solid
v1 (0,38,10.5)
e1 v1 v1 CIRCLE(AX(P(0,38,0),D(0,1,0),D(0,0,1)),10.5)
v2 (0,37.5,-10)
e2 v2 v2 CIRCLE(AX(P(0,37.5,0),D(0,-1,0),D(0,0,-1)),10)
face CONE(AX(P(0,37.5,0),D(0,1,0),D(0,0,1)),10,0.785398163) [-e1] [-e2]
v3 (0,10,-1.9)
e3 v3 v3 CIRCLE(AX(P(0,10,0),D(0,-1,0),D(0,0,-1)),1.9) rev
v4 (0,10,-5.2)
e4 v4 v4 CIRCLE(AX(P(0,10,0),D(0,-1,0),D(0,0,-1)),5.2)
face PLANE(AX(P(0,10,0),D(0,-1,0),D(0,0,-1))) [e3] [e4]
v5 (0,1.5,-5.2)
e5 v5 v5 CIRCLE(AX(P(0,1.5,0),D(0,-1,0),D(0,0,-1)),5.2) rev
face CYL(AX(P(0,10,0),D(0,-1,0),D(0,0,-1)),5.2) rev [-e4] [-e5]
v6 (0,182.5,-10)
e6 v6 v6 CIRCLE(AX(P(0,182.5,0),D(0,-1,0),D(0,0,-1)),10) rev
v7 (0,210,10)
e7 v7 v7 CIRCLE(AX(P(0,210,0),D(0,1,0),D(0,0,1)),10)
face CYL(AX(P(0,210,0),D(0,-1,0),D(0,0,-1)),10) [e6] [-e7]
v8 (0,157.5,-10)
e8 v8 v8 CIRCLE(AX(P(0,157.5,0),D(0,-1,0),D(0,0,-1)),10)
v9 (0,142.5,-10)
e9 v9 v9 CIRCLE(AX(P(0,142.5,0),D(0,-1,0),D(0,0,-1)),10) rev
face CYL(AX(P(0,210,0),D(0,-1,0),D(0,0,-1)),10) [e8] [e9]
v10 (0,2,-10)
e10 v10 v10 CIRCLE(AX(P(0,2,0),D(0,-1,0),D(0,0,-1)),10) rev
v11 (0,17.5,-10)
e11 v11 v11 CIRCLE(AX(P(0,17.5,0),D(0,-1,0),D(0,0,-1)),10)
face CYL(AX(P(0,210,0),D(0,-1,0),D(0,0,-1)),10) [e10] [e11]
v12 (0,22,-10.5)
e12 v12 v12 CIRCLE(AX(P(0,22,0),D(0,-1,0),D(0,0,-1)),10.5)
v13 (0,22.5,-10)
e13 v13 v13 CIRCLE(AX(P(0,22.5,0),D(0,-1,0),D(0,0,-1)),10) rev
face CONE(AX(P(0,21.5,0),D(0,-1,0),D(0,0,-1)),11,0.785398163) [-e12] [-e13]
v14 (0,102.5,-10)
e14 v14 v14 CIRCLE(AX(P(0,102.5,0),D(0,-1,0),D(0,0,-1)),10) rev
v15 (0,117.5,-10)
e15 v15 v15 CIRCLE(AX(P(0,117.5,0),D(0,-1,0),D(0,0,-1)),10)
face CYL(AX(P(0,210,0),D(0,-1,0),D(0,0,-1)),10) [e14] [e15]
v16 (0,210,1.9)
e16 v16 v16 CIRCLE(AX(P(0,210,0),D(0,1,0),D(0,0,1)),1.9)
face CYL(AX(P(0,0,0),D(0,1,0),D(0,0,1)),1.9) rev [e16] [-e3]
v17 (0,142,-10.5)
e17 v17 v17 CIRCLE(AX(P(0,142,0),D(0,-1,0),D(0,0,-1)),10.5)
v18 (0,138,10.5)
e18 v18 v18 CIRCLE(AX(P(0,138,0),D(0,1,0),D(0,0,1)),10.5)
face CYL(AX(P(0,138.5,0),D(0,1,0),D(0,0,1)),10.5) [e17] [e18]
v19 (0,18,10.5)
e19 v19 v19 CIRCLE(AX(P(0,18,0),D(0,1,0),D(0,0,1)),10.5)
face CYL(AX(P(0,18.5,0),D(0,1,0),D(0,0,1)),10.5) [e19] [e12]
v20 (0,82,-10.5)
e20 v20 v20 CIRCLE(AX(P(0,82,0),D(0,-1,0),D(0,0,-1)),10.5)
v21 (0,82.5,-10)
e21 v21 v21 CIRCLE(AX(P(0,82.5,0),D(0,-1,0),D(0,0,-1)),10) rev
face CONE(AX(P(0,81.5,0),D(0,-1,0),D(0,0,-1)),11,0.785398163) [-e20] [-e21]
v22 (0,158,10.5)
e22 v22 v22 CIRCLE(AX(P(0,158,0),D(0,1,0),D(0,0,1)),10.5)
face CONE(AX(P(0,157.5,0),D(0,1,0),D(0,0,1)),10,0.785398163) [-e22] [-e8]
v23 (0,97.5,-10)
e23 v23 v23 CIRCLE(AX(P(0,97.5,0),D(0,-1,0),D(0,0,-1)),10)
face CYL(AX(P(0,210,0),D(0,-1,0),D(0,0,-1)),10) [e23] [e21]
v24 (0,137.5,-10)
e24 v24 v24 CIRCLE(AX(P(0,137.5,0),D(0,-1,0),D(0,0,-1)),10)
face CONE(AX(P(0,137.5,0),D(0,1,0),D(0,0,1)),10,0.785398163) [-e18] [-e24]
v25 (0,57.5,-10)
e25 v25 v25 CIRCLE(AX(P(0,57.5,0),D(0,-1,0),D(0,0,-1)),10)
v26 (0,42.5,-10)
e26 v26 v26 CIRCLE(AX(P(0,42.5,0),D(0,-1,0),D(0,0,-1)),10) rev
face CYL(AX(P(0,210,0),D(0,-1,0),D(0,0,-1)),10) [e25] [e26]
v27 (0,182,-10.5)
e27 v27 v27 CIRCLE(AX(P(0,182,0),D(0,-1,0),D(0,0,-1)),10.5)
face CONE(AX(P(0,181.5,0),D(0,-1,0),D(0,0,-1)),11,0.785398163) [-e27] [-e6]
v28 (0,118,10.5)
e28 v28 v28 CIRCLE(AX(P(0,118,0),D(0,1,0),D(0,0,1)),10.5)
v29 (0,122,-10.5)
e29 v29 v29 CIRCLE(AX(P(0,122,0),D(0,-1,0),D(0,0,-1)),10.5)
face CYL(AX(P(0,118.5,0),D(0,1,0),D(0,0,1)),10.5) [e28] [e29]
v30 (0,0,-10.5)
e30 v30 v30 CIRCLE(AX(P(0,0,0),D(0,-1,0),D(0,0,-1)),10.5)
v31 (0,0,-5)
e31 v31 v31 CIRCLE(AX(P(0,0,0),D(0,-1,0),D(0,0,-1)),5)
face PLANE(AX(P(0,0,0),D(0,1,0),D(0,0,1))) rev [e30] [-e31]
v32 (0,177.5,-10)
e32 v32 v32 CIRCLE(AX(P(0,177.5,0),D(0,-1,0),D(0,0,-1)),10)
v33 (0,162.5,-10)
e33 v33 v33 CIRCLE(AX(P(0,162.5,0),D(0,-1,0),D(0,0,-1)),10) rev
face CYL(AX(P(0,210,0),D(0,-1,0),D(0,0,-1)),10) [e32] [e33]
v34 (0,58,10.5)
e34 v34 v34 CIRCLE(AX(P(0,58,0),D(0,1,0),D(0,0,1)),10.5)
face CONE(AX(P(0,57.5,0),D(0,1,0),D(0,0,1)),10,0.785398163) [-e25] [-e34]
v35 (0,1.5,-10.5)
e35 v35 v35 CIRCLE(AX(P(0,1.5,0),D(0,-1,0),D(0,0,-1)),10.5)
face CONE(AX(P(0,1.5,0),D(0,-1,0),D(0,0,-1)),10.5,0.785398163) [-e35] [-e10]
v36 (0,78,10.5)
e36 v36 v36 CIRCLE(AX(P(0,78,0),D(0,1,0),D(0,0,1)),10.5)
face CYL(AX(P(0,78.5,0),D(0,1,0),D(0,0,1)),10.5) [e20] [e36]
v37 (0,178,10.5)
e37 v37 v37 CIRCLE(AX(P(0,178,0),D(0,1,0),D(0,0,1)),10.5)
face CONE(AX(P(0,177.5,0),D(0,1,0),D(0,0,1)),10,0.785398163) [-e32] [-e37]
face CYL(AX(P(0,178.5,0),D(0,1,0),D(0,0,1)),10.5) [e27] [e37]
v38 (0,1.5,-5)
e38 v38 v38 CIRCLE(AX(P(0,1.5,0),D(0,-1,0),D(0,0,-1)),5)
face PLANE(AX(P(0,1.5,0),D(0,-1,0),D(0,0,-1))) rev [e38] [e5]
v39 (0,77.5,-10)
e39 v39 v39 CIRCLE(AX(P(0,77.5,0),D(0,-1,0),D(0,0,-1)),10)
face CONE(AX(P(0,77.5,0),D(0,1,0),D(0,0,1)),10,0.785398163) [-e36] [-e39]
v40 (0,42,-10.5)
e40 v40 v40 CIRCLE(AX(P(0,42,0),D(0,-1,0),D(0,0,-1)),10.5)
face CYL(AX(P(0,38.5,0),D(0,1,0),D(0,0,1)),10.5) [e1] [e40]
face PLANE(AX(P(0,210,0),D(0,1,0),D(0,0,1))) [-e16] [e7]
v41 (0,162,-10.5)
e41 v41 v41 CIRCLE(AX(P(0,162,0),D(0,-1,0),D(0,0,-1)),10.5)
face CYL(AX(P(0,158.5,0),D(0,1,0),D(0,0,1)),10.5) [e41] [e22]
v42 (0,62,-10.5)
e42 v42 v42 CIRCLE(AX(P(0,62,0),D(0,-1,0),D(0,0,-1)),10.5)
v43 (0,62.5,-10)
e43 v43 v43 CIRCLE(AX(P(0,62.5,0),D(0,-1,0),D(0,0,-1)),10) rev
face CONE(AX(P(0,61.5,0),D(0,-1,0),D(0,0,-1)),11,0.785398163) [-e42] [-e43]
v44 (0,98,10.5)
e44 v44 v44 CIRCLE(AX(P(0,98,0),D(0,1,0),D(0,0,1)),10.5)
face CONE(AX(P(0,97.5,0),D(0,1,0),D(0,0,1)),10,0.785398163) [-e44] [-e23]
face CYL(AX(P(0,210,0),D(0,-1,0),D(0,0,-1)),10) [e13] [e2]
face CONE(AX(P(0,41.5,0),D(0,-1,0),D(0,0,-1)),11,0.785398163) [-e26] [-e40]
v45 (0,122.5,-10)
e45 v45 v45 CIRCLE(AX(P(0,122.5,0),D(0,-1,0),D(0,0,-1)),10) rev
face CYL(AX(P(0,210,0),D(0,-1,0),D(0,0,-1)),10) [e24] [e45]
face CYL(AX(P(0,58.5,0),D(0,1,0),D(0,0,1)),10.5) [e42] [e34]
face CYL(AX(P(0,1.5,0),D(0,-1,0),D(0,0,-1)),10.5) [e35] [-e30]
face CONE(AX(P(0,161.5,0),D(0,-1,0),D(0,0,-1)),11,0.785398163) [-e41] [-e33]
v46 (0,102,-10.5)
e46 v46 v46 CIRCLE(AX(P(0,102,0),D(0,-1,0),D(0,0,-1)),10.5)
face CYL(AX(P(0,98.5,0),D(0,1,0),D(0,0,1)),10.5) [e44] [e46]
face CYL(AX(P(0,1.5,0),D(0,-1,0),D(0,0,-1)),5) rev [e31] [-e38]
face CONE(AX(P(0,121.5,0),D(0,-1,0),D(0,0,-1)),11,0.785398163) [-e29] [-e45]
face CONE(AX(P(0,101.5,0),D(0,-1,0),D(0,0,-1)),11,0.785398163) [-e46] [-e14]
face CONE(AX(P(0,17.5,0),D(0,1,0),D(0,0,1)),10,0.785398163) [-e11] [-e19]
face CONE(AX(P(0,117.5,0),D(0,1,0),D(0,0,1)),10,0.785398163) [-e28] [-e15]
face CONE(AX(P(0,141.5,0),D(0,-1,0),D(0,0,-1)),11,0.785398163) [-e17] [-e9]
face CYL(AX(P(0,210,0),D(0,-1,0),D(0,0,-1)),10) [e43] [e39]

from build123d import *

# Parameters (mm, degrees)
SKETCH_1_R                             = 10
EXTRUDE_1_DEPTH                        = 210
SKETCH_2_R                             = 10.5
EXTRUDE_2_DEPTH                        = 1.5
CHAMFER_1_SIZE                         = 1
PATTERN_LINEAR_1_COUNT                 = 5
PATTERN_LINEAR_1_PITCH                 = 20
CHAMFER_1_OF_PATTERN_LINEAR_1_SIZE     = 1
PATTERN_LINEAR_1_COL_COUNT             = 5
PATTERN_LINEAR_1_COL_PITCH             = 20
CHAMFER_1_OF_PATTERN_LINEAR_1_COL_SIZE = 1
CUT_EXTRUDE_1_DEPTH                    = 211.524345386
CUT_EXTRUDE_1_DEPTH_BACK               = 211.524345386
SKETCH_3_R                             = 1.9
SKETCH_11_R                            = 5.2
CUT_EXTRUDE_2_DEPTH                    = 10
SKETCH_12_R                            = 10.5
SKETCH_12_R_2                          = 5
EXTRUDE_3_DEPTH                        = 1.5
CHAMFER_2_SIZE                         = 0.5


# Some blends are built 0.0001 mm under size
with BuildPart() as part:
    # 草图1 → 凸台-拉伸1 (new body)
    with BuildSketch(Plane(origin=(0, 0, 0), x_dir=(1, 0, 0), z_dir=(0, 1, 0))):
        with Locations(Location((0, 0, 0), (0, 0, 270))):
            Circle(SKETCH_1_R)
    extrude(amount=EXTRUDE_1_DEPTH)

    # 草图2 → 凸台-拉伸2 (add, symmetric)
    with BuildSketch(Plane(origin=(0, 100, 0), x_dir=(-1, 0, 0), z_dir=(0, -1, 0))):
        with Locations(Location((0, 0, 0), (0, 0, 90))):
            Circle(SKETCH_2_R)
    extrude_2 = extrude(amount=EXTRUDE_2_DEPTH, both=True)

    # 倒角1
    # the kernel refuses this chamfer: 1 mm, written as the material it adds along each edge
    with BuildSketch(Plane(origin=(0, 101.5, 0), x_dir=(0, 0, 1), z_dir=(1, 0, 0))) as chamfer_1_piece_1_section:
        Polygon((10 + CHAMFER_1_SIZE, 0), (10, -CHAMFER_1_SIZE), (10, 0), align=None)
    chamfer_1_piece_1 = revolve(axis=Axis((0, 101.5, 0), (0, -1, 0)), mode=Mode.PRIVATE)
    chamfer_1_piece_1 = chamfer_1_piece_1 & Plane(origin=(0, 102.243131565, 0), x_dir=(0, 0, -1), z_dir=(0, -1, 0)) * Cylinder(10.5, 44, mode=Mode.PRIVATE)
    add(chamfer_1_piece_1)
    with BuildSketch(Plane(origin=(0, 98.5, 0), x_dir=(0, 0, 1), z_dir=(1, 0, 0))) as chamfer_1_piece_2_section:
        Polygon((10, CHAMFER_1_SIZE), (10 + CHAMFER_1_SIZE, 0), (10, 0), align=None)
    chamfer_1_piece_2 = revolve(axis=Axis((0, 98.5, 0), (0, -1, 0)), mode=Mode.PRIVATE)
    chamfer_1_piece_2 = chamfer_1_piece_2 & Plane(origin=(0, 97.756868435, 0), x_dir=(0, 0, -1), z_dir=(0, -1, 0)) * Cylinder(10.5, 44, mode=Mode.PRIVATE)
    add(chamfer_1_piece_2)

    # 阵列(线性)1: 凸台-拉伸2 ×5
    with Locations(*[(0, i * PATTERN_LINEAR_1_PITCH, 0) for i in range(1, PATTERN_LINEAR_1_COUNT)]):
        add(extrude_2)

    # 倒角1 of 阵列(线性)1
    # the kernel refuses this chamfer: 1 mm, written as the material it adds along each edge
    with BuildSketch(Plane(origin=(0, 121.5, 0), x_dir=(0, 0, 1), z_dir=(1, 0, 0))) as chamfer_1_of_pattern_linear_1_piece_1_section:
        Polygon((10 + CHAMFER_1_OF_PATTERN_LINEAR_1_SIZE, 0), (10, -CHAMFER_1_OF_PATTERN_LINEAR_1_SIZE), (10, 0), align=None)
    chamfer_1_of_pattern_linear_1_piece_1 = revolve(axis=Axis((0, 121.5, 0), (0, -1, 0)), mode=Mode.PRIVATE)
    chamfer_1_of_pattern_linear_1_piece_1 = chamfer_1_of_pattern_linear_1_piece_1 & Plane(origin=(0, 122.243131565, 0), x_dir=(0, 0, -1), z_dir=(0, -1, 0)) * Cylinder(10.5, 44, mode=Mode.PRIVATE)
    add(chamfer_1_of_pattern_linear_1_piece_1)
    with BuildSketch(Plane(origin=(0, 118.5, 0), x_dir=(0, 0, 1), z_dir=(1, 0, 0))) as chamfer_1_of_pattern_linear_1_piece_2_section:
        Polygon((10, CHAMFER_1_OF_PATTERN_LINEAR_1_SIZE), (10 + CHAMFER_1_OF_PATTERN_LINEAR_1_SIZE, 0), (10, 0), align=None)
    chamfer_1_of_pattern_linear_1_piece_2 = revolve(axis=Axis((0, 118.5, 0), (0, -1, 0)), mode=Mode.PRIVATE)
    chamfer_1_of_pattern_linear_1_piece_2 = chamfer_1_of_pattern_linear_1_piece_2 & Plane(origin=(0, 117.756868435, 0), x_dir=(0, 0, -1), z_dir=(0, -1, 0)) * Cylinder(10.5, 44, mode=Mode.PRIVATE)
    add(chamfer_1_of_pattern_linear_1_piece_2)
    with BuildSketch(Plane(origin=(0, 141.5, 0), x_dir=(0, 0, 1), z_dir=(1, 0, 0))) as chamfer_1_of_pattern_linear_1_piece_3_section:
        Polygon((10 + CHAMFER_1_OF_PATTERN_LINEAR_1_SIZE, 0), (10, -CHAMFER_1_OF_PATTERN_LINEAR_1_SIZE), (10, 0), align=None)
    chamfer_1_of_pattern_linear_1_piece_3 = revolve(axis=Axis((0, 141.5, 0), (0, -1, 0)), mode=Mode.PRIVATE)
    chamfer_1_of_pattern_linear_1_piece_3 = chamfer_1_of_pattern_linear_1_piece_3 & Plane(origin=(0, 142.243131565, 0), x_dir=(0, 0, -1), z_dir=(0, -1, 0)) * Cylinder(10.5, 44, mode=Mode.PRIVATE)
    add(chamfer_1_of_pattern_linear_1_piece_3)
    with BuildSketch(Plane(origin=(0, 138.5, 0), x_dir=(0, 0, 1), z_dir=(1, 0, 0))) as chamfer_1_of_pattern_linear_1_piece_4_section:
        Polygon((10, CHAMFER_1_OF_PATTERN_LINEAR_1_SIZE), (10 + CHAMFER_1_OF_PATTERN_LINEAR_1_SIZE, 0), (10, 0), align=None)
    chamfer_1_of_pattern_linear_1_piece_4 = revolve(axis=Axis((0, 138.5, 0), (0, -1, 0)), mode=Mode.PRIVATE)
    chamfer_1_of_pattern_linear_1_piece_4 = chamfer_1_of_pattern_linear_1_piece_4 & Plane(origin=(0, 137.756868435, 0), x_dir=(0, 0, -1), z_dir=(0, -1, 0)) * Cylinder(10.5, 44, mode=Mode.PRIVATE)
    add(chamfer_1_of_pattern_linear_1_piece_4)
    with BuildSketch(Plane(origin=(0, 161.5, 0), x_dir=(0, 0, 1), z_dir=(1, 0, 0))) as chamfer_1_of_pattern_linear_1_piece_5_section:
        Polygon((10 + CHAMFER_1_OF_PATTERN_LINEAR_1_SIZE, 0), (10, -CHAMFER_1_OF_PATTERN_LINEAR_1_SIZE), (10, 0), align=None)
    chamfer_1_of_pattern_linear_1_piece_5 = revolve(axis=Axis((0, 161.5, 0), (0, -1, 0)), mode=Mode.PRIVATE)
    chamfer_1_of_pattern_linear_1_piece_5 = chamfer_1_of_pattern_linear_1_piece_5 & Plane(origin=(0, 162.243131565, 0), x_dir=(0, 0, -1), z_dir=(0, -1, 0)) * Cylinder(10.5, 44, mode=Mode.PRIVATE)
    add(chamfer_1_of_pattern_linear_1_piece_5)
    with BuildSketch(Plane(origin=(0, 158.5, 0), x_dir=(0, 0, 1), z_dir=(1, 0, 0))) as chamfer_1_of_pattern_linear_1_piece_6_section:
        Polygon((10, CHAMFER_1_OF_PATTERN_LINEAR_1_SIZE), (10 + CHAMFER_1_OF_PATTERN_LINEAR_1_SIZE, 0), (10, 0), align=None)
    chamfer_1_of_pattern_linear_1_piece_6 = revolve(axis=Axis((0, 158.5, 0), (0, -1, 0)), mode=Mode.PRIVATE)
    chamfer_1_of_pattern_linear_1_piece_6 = chamfer_1_of_pattern_linear_1_piece_6 & Plane(origin=(0, 157.756868435, 0), x_dir=(0, 0, -1), z_dir=(0, -1, 0)) * Cylinder(10.5, 44, mode=Mode.PRIVATE)
    add(chamfer_1_of_pattern_linear_1_piece_6)
    with BuildSketch(Plane(origin=(0, 181.5, 0), x_dir=(0, 0, 1), z_dir=(1, 0, 0))) as chamfer_1_of_pattern_linear_1_piece_7_section:
        Polygon((10 + CHAMFER_1_OF_PATTERN_LINEAR_1_SIZE, 0), (10, -CHAMFER_1_OF_PATTERN_LINEAR_1_SIZE), (10, 0), align=None)
    chamfer_1_of_pattern_linear_1_piece_7 = revolve(axis=Axis((0, 181.5, 0), (0, -1, 0)), mode=Mode.PRIVATE)
    chamfer_1_of_pattern_linear_1_piece_7 = chamfer_1_of_pattern_linear_1_piece_7 & Plane(origin=(0, 182.243131565, 0), x_dir=(0, 0, -1), z_dir=(0, -1, 0)) * Cylinder(10.5, 44, mode=Mode.PRIVATE)
    add(chamfer_1_of_pattern_linear_1_piece_7)
    with BuildSketch(Plane(origin=(0, 178.5, 0), x_dir=(0, 0, 1), z_dir=(1, 0, 0))) as chamfer_1_of_pattern_linear_1_piece_8_section:
        Polygon((10, CHAMFER_1_OF_PATTERN_LINEAR_1_SIZE), (10 + CHAMFER_1_OF_PATTERN_LINEAR_1_SIZE, 0), (10, 0), align=None)
    chamfer_1_of_pattern_linear_1_piece_8 = revolve(axis=Axis((0, 178.5, 0), (0, -1, 0)), mode=Mode.PRIVATE)
    chamfer_1_of_pattern_linear_1_piece_8 = chamfer_1_of_pattern_linear_1_piece_8 & Plane(origin=(0, 177.756868435, 0), x_dir=(0, 0, -1), z_dir=(0, -1, 0)) * Cylinder(10.5, 44, mode=Mode.PRIVATE)
    add(chamfer_1_of_pattern_linear_1_piece_8)

    # 阵列(线性)1 col: 凸台-拉伸2 ×5
    with Locations(*[(0, -i * PATTERN_LINEAR_1_COL_PITCH, 0) for i in range(1, PATTERN_LINEAR_1_COL_COUNT)]):
        add(extrude_2)

    # 倒角1 of 阵列(线性)1 col
    # the kernel refuses this chamfer: 1 mm, written as the material it adds along each edge
    with BuildSketch(Plane(origin=(0, 81.5, 0), x_dir=(0, 0, 1), z_dir=(1, 0, 0))) as chamfer_1_of_pattern_linear_1_col_piece_1_section:
        Polygon((10, -CHAMFER_1_OF_PATTERN_LINEAR_1_COL_SIZE), (10 + CHAMFER_1_OF_PATTERN_LINEAR_1_COL_SIZE, 0), (10, 0), align=None)
    chamfer_1_of_pattern_linear_1_col_piece_1 = revolve(axis=Axis((0, 81.5, 0), (0, -1, 0)), mode=Mode.PRIVATE)
    chamfer_1_of_pattern_linear_1_col_piece_1 = chamfer_1_of_pattern_linear_1_col_piece_1 & Plane(origin=(0, 82.243131565, 0), x_dir=(0, 0, -1), z_dir=(0, -1, 0)) * Cylinder(10.5, 44, mode=Mode.PRIVATE)
    add(chamfer_1_of_pattern_linear_1_col_piece_1)
    with BuildSketch(Plane(origin=(0, 78.5, 0), x_dir=(0, 0, 1), z_dir=(1, 0, 0))) as chamfer_1_of_pattern_linear_1_col_piece_2_section:
        Polygon((10 + CHAMFER_1_OF_PATTERN_LINEAR_1_COL_SIZE, 0), (10, CHAMFER_1_OF_PATTERN_LINEAR_1_COL_SIZE), (10, 0), align=None)
    chamfer_1_of_pattern_linear_1_col_piece_2 = revolve(axis=Axis((0, 78.5, 0), (0, -1, 0)), mode=Mode.PRIVATE)
    chamfer_1_of_pattern_linear_1_col_piece_2 = chamfer_1_of_pattern_linear_1_col_piece_2 & Plane(origin=(0, 77.756868435, 0), x_dir=(0, 0, -1), z_dir=(0, -1, 0)) * Cylinder(10.5, 44, mode=Mode.PRIVATE)
    add(chamfer_1_of_pattern_linear_1_col_piece_2)
    with BuildSketch(Plane(origin=(0, 61.5, 0), x_dir=(0, 0, 1), z_dir=(1, 0, 0))) as chamfer_1_of_pattern_linear_1_col_piece_3_section:
        Polygon((10, -CHAMFER_1_OF_PATTERN_LINEAR_1_COL_SIZE), (10 + CHAMFER_1_OF_PATTERN_LINEAR_1_COL_SIZE, 0), (10, 0), align=None)
    chamfer_1_of_pattern_linear_1_col_piece_3 = revolve(axis=Axis((0, 61.5, 0), (0, -1, 0)), mode=Mode.PRIVATE)
    chamfer_1_of_pattern_linear_1_col_piece_3 = chamfer_1_of_pattern_linear_1_col_piece_3 & Plane(origin=(0, 62.243131565, 0), x_dir=(0, 0, -1), z_dir=(0, -1, 0)) * Cylinder(10.5, 44, mode=Mode.PRIVATE)
    add(chamfer_1_of_pattern_linear_1_col_piece_3)
    with BuildSketch(Plane(origin=(0, 58.5, 0), x_dir=(0, 0, 1), z_dir=(1, 0, 0))) as chamfer_1_of_pattern_linear_1_col_piece_4_section:
        Polygon((10 + CHAMFER_1_OF_PATTERN_LINEAR_1_COL_SIZE, 0), (10, CHAMFER_1_OF_PATTERN_LINEAR_1_COL_SIZE), (10, 0), align=None)
    chamfer_1_of_pattern_linear_1_col_piece_4 = revolve(axis=Axis((0, 58.5, 0), (0, -1, 0)), mode=Mode.PRIVATE)
    chamfer_1_of_pattern_linear_1_col_piece_4 = chamfer_1_of_pattern_linear_1_col_piece_4 & Plane(origin=(0, 57.756868435, 0), x_dir=(0, 0, -1), z_dir=(0, -1, 0)) * Cylinder(10.5, 44, mode=Mode.PRIVATE)
    add(chamfer_1_of_pattern_linear_1_col_piece_4)
    with BuildSketch(Plane(origin=(0, 41.5, 0), x_dir=(0, 0, 1), z_dir=(1, 0, 0))) as chamfer_1_of_pattern_linear_1_col_piece_5_section:
        Polygon((10, -CHAMFER_1_OF_PATTERN_LINEAR_1_COL_SIZE), (10 + CHAMFER_1_OF_PATTERN_LINEAR_1_COL_SIZE, 0), (10, 0), align=None)
    chamfer_1_of_pattern_linear_1_col_piece_5 = revolve(axis=Axis((0, 41.5, 0), (0, -1, 0)), mode=Mode.PRIVATE)
    chamfer_1_of_pattern_linear_1_col_piece_5 = chamfer_1_of_pattern_linear_1_col_piece_5 & Plane(origin=(0, 42.243131565, 0), x_dir=(0, 0, -1), z_dir=(0, -1, 0)) * Cylinder(10.5, 44, mode=Mode.PRIVATE)
    add(chamfer_1_of_pattern_linear_1_col_piece_5)
    with BuildSketch(Plane(origin=(0, 38.5, 0), x_dir=(0, 0, 1), z_dir=(1, 0, 0))) as chamfer_1_of_pattern_linear_1_col_piece_6_section:
        Polygon((10 + CHAMFER_1_OF_PATTERN_LINEAR_1_COL_SIZE, 0), (10, CHAMFER_1_OF_PATTERN_LINEAR_1_COL_SIZE), (10, 0), align=None)
    chamfer_1_of_pattern_linear_1_col_piece_6 = revolve(axis=Axis((0, 38.5, 0), (0, -1, 0)), mode=Mode.PRIVATE)
    chamfer_1_of_pattern_linear_1_col_piece_6 = chamfer_1_of_pattern_linear_1_col_piece_6 & Plane(origin=(0, 37.756868435, 0), x_dir=(0, 0, -1), z_dir=(0, -1, 0)) * Cylinder(10.5, 44, mode=Mode.PRIVATE)
    add(chamfer_1_of_pattern_linear_1_col_piece_6)
    with BuildSketch(Plane(origin=(0, 21.5, 0), x_dir=(0, 0, 1), z_dir=(1, 0, 0))) as chamfer_1_of_pattern_linear_1_col_piece_7_section:
        Polygon((10, -CHAMFER_1_OF_PATTERN_LINEAR_1_COL_SIZE), (10 + CHAMFER_1_OF_PATTERN_LINEAR_1_COL_SIZE, 0), (10, 0), align=None)
    chamfer_1_of_pattern_linear_1_col_piece_7 = revolve(axis=Axis((0, 21.5, 0), (0, -1, 0)), mode=Mode.PRIVATE)
    chamfer_1_of_pattern_linear_1_col_piece_7 = chamfer_1_of_pattern_linear_1_col_piece_7 & Plane(origin=(0, 22.243131565, 0), x_dir=(0, 0, -1), z_dir=(0, -1, 0)) * Cylinder(10.5, 44, mode=Mode.PRIVATE)
    add(chamfer_1_of_pattern_linear_1_col_piece_7)
    with BuildSketch(Plane(origin=(0, 18.5, 0), x_dir=(0, 0, 1), z_dir=(1, 0, 0))) as chamfer_1_of_pattern_linear_1_col_piece_8_section:
        Polygon((10 + CHAMFER_1_OF_PATTERN_LINEAR_1_COL_SIZE, 0), (10, CHAMFER_1_OF_PATTERN_LINEAR_1_COL_SIZE), (10, 0), align=None)
    chamfer_1_of_pattern_linear_1_col_piece_8 = revolve(axis=Axis((0, 18.5, 0), (0, -1, 0)), mode=Mode.PRIVATE)
    chamfer_1_of_pattern_linear_1_col_piece_8 = chamfer_1_of_pattern_linear_1_col_piece_8 & Plane(origin=(0, 17.756868435, 0), x_dir=(0, 0, -1), z_dir=(0, -1, 0)) * Cylinder(10.5, 44, mode=Mode.PRIVATE)
    add(chamfer_1_of_pattern_linear_1_col_piece_8)

    # 草图3 → 切除-拉伸1 (cut, two sides: drawn at the far end of the back side and taken through both)
    with BuildSketch(Plane(origin=(0, 210, 0), x_dir=(1, 0, 0), z_dir=(0, 1, 0)).offset(-CUT_EXTRUDE_1_DEPTH_BACK)):
        with Locations(Location((0, 0, 0), (0, 0, 270))):
            Circle(SKETCH_3_R)
    extrude(amount=CUT_EXTRUDE_1_DEPTH + CUT_EXTRUDE_1_DEPTH_BACK, mode=Mode.SUBTRACT)

    # 草图11 → 切除-拉伸2 (cut)
    with BuildSketch(Plane.XZ):
        with Locations(Location((0, 0, 0), (0, 0, 270))):
            Circle(SKETCH_11_R)
    extrude(amount=-CUT_EXTRUDE_2_DEPTH, mode=Mode.SUBTRACT)

    # 草图12 → 凸台-拉伸3 (add)
    with BuildSketch(Plane.XZ):
        with Locations(Location((0, 0, 0), (0, 0, 90))):
            Circle(SKETCH_12_R)
        with Locations(Location((0, 0, 0), (0, 0, 270))):
            Circle(SKETCH_12_R_2, mode=Mode.SUBTRACT)
    extrude(amount=-EXTRUDE_3_DEPTH)

    # 倒角2
    chamfer_2_edges = [part.edges().sort_by_distance(p)[0] for p in [
        (0, 1.5, -10),
    ]]
    chamfer(chamfer_2_edges, length=CHAMFER_2_SIZE - 0.0001)  # a hair under: the kernel refuses the full size


solid = part.part
